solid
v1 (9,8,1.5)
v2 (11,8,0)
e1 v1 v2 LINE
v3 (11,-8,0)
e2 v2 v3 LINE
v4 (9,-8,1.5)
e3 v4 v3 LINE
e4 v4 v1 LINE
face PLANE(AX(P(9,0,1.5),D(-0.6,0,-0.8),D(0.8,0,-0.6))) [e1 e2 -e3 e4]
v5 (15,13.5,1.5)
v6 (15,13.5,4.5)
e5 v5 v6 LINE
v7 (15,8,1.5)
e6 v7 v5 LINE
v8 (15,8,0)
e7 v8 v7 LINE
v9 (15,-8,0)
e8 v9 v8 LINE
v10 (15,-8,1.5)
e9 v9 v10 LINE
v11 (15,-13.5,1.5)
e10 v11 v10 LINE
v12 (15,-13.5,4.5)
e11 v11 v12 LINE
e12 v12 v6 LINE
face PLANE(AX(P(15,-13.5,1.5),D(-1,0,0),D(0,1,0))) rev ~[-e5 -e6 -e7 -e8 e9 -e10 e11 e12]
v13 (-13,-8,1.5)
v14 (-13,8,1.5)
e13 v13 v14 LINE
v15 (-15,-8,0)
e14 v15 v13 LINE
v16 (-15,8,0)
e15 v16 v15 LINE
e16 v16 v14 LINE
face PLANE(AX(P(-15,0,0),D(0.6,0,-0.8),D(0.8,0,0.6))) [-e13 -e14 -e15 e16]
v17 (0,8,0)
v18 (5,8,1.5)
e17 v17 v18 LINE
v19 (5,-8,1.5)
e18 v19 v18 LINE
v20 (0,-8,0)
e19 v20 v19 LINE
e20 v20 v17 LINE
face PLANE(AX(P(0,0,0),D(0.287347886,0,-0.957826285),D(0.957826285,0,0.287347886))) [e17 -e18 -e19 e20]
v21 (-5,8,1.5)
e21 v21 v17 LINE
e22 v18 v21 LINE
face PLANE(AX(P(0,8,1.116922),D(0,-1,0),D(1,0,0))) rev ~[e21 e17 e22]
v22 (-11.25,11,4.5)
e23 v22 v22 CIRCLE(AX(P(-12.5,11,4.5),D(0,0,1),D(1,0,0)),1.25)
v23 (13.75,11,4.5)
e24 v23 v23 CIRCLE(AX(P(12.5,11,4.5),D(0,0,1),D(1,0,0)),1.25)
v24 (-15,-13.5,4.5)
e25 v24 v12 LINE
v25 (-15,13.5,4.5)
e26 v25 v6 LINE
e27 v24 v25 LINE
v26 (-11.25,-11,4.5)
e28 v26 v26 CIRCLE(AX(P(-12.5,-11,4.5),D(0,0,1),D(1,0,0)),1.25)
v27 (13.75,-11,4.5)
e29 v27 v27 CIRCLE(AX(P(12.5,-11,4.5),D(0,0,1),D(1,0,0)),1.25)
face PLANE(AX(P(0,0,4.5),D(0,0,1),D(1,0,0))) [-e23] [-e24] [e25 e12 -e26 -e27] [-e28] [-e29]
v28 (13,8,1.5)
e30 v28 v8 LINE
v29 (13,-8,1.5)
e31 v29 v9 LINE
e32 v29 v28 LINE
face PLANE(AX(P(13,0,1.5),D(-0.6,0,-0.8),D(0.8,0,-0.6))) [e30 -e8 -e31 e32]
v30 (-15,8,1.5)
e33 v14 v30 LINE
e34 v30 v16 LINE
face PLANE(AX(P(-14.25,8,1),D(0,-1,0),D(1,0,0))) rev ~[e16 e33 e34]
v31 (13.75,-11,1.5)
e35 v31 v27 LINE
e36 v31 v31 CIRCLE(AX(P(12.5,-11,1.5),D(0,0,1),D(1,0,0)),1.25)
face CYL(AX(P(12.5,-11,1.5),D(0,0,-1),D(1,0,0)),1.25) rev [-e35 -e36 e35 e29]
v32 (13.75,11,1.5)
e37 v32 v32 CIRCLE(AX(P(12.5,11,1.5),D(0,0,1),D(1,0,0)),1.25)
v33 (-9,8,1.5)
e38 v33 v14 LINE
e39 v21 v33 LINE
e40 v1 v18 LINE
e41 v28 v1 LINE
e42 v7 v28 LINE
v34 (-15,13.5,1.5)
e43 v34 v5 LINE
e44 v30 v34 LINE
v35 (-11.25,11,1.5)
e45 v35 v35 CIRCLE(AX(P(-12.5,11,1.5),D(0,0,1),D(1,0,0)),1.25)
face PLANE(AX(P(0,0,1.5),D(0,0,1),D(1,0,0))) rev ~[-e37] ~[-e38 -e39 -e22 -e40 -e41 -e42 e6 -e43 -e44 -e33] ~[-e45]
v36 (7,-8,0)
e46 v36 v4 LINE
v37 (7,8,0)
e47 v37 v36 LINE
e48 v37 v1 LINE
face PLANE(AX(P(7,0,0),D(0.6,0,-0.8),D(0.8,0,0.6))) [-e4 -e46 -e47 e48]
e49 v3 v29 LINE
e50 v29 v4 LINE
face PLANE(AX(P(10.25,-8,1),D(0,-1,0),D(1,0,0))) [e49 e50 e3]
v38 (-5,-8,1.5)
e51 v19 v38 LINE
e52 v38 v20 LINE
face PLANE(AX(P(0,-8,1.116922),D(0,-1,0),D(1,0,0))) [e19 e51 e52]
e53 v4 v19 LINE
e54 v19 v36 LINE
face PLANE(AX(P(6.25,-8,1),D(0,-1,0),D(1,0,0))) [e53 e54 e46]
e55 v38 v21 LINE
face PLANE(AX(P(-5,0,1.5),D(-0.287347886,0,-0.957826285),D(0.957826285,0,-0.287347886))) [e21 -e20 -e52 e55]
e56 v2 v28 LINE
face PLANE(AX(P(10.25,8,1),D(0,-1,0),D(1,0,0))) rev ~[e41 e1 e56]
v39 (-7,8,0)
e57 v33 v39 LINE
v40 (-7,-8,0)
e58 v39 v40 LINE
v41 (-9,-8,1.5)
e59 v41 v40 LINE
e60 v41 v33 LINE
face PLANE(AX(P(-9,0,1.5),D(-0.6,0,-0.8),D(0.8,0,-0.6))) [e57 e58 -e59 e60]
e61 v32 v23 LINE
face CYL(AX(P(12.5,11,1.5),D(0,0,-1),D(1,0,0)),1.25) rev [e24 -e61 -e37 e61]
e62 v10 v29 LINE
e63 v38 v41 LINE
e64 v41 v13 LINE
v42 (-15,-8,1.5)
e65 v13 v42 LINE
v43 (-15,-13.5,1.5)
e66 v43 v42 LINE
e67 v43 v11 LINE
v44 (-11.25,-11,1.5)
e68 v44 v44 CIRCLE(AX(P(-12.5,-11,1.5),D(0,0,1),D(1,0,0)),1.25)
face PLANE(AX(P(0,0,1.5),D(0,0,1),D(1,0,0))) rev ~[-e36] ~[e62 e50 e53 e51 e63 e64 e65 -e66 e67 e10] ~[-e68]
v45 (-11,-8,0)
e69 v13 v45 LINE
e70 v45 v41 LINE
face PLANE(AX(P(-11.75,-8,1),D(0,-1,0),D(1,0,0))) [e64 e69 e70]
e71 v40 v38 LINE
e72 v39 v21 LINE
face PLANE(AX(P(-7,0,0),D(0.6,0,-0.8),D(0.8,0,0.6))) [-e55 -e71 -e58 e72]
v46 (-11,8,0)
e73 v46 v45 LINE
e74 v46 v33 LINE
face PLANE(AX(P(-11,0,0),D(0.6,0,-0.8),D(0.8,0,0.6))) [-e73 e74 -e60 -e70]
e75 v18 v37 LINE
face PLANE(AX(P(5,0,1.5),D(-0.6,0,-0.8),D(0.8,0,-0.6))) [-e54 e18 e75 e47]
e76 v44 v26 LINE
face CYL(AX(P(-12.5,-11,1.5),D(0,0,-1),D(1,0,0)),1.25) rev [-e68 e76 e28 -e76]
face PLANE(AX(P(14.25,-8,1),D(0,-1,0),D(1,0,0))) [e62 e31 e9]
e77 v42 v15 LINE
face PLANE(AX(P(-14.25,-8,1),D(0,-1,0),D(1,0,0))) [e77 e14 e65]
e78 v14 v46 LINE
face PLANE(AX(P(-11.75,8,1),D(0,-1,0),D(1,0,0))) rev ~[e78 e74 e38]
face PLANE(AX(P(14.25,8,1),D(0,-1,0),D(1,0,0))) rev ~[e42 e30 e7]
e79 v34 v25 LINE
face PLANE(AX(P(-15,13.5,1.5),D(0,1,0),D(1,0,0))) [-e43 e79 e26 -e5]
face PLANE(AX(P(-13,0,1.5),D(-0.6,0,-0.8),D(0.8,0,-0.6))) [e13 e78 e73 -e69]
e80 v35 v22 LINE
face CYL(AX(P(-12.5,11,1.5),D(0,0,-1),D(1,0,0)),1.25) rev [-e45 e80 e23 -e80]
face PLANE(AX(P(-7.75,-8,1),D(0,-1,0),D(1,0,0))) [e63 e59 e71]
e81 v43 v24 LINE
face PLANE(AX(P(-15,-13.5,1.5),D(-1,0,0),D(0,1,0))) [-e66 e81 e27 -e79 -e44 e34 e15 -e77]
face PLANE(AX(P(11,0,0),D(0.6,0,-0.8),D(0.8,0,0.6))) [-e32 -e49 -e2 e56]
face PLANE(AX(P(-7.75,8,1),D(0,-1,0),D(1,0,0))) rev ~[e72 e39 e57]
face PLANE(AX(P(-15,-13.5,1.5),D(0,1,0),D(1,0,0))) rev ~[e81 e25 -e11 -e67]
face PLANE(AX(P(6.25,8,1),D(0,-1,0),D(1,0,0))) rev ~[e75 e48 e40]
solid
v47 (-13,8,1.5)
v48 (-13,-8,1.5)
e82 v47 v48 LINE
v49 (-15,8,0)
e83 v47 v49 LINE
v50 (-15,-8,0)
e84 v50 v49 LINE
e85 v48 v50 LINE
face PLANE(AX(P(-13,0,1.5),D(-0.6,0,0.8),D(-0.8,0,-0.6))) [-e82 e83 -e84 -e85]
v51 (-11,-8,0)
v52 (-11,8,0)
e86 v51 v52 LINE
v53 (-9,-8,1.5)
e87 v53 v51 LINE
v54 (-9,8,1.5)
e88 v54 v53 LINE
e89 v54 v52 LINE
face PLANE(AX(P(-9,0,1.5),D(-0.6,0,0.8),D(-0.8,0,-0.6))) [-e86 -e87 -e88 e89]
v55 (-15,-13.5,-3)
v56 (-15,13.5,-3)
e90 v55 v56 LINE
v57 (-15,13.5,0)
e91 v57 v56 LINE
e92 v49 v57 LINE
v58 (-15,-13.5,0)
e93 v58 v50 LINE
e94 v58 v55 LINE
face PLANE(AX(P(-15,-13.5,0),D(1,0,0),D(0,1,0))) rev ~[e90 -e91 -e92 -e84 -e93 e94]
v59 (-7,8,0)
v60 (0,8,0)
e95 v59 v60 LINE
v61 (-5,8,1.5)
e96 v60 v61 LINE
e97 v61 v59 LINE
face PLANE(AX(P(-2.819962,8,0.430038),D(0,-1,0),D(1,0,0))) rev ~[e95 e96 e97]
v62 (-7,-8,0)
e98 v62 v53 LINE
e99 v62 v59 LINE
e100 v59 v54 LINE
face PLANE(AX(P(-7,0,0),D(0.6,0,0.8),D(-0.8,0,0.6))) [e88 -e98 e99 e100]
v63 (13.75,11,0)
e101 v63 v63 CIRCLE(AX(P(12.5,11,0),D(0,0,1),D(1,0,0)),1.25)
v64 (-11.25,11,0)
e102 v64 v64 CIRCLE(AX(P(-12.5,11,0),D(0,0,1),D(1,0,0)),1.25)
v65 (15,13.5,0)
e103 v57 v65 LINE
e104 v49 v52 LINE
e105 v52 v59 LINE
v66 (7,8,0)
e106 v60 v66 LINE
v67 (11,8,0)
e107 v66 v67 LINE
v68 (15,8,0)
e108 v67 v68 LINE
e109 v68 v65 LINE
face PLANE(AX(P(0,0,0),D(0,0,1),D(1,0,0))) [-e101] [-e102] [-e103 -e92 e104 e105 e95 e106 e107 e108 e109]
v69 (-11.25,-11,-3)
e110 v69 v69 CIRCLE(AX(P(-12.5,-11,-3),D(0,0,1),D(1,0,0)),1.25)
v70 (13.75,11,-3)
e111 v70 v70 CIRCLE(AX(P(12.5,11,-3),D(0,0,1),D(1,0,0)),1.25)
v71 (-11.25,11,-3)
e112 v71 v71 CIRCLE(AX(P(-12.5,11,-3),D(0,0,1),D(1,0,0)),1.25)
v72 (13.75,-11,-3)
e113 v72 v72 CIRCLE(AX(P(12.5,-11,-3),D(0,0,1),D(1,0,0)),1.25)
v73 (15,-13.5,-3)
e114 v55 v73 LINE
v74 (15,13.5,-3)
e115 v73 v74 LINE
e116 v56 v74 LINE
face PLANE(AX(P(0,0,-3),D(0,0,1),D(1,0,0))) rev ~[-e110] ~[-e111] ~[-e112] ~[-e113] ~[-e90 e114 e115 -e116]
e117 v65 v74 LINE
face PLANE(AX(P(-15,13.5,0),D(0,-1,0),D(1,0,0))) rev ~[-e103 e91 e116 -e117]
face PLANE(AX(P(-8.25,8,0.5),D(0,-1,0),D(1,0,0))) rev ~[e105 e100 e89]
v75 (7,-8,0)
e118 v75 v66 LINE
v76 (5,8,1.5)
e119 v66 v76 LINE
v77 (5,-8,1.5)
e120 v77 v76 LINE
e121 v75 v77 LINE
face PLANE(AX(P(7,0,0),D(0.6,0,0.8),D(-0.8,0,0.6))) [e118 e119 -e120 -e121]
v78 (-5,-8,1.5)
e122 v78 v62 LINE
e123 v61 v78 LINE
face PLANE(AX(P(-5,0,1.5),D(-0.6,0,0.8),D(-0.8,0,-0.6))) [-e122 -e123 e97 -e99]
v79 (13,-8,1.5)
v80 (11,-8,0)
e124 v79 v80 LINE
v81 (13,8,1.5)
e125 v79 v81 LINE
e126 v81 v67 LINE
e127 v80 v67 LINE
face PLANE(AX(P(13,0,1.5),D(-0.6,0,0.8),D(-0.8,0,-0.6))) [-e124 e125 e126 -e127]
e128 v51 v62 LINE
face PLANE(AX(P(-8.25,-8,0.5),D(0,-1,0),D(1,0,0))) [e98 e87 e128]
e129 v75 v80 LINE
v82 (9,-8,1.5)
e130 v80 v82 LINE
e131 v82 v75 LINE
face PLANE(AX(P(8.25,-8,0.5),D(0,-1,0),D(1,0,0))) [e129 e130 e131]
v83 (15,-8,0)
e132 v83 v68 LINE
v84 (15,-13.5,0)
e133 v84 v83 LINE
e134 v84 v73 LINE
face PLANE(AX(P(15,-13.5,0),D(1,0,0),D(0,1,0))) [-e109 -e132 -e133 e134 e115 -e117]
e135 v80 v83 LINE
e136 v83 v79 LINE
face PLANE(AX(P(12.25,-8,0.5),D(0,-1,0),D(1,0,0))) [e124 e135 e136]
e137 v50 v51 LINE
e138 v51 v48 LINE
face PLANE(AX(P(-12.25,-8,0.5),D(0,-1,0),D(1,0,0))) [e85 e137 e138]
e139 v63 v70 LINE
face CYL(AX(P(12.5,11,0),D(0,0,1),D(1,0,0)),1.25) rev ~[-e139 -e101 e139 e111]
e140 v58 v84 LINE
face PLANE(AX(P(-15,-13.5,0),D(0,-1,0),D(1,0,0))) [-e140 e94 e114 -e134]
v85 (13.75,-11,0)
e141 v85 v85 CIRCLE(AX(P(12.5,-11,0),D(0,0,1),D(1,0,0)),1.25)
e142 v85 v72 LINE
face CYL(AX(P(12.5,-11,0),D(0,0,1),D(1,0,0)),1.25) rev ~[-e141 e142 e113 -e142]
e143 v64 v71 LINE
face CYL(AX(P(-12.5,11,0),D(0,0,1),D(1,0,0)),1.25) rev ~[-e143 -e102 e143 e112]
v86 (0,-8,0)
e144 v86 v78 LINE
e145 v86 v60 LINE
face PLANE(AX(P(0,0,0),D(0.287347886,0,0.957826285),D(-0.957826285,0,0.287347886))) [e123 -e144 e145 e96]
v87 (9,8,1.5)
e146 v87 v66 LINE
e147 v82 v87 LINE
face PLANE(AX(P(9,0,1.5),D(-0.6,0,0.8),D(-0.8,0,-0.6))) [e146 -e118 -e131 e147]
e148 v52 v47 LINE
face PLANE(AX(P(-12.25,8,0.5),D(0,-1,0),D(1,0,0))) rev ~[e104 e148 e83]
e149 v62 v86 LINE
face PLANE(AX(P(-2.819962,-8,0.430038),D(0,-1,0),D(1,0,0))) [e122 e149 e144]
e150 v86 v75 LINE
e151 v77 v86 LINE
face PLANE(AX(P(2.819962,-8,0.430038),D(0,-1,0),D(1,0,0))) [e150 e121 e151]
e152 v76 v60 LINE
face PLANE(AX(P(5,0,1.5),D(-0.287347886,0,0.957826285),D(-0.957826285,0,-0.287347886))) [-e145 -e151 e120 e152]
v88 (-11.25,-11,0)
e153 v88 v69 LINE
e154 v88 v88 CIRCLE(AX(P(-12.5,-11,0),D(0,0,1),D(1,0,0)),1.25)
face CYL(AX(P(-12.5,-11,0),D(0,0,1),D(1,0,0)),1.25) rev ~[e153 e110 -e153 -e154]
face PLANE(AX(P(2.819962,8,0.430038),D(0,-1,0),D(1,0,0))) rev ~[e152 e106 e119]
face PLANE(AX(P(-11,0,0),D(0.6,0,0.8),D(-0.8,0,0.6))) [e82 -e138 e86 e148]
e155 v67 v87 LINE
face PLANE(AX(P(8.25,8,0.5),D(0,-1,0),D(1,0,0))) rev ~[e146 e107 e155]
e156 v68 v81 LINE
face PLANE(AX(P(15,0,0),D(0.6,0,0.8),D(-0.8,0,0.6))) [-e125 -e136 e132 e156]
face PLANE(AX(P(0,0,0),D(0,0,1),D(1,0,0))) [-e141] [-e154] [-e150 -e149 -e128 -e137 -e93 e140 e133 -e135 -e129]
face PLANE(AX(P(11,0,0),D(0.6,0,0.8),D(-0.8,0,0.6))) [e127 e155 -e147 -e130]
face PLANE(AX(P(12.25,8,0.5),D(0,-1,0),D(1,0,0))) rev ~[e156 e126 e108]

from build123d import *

# Parameters (mm, degrees)
F2_DEPTH = 8
F0_W     = 30
F0_H     = 27
F0_R     = 1.25
F3_DEPTH = 3
F4_DEPTH = 8
F5_START = 1.5
F5_DEPTH = 3


with BuildPart() as f2:
    # F1 (on Front) → F2 (new body, symmetric)
    with BuildSketch(Plane.XZ):
        Polygon((-5, 1.5), (-5, 0), (0, 0), align=None)
        Polygon((-5, 1.5), (-7, 0), (-5, 0), align=None)
    extrude(amount=F2_DEPTH, both=True)



with BuildPart() as f2b:
    # F1 (on Front) → F2, piece 2 (new body, symmetric)
    with BuildSketch(Plane.XZ):
        Polygon((-9, 1.5), (-9, 0), (-7, 0), align=None)
        Polygon((-9, 1.5), (-11, 0), (-9, 0), align=None)
    extrude(amount=F2_DEPTH, both=True)


with BuildPart() as f2c:
    # F1 (on Front) → F2, piece 3 (new body, symmetric)
    with BuildSketch(Plane.XZ):
        Polygon((-13, 1.5), (-13, 0), (-11, 0), align=None)
        Polygon((-13, 1.5), (-15, 0), (-13, 0), align=None)
    extrude(amount=F2_DEPTH, both=True)


with BuildPart() as f2d:
    # F1 (on Front) → F2, piece 4 (new body, symmetric)
    with BuildSketch(Plane.XZ):
        Polygon((5, 1.5), (0, 0), (5, 0), align=None)
        Polygon((7, 0), (5, 1.5), (5, 0), align=None)
    extrude(amount=F2_DEPTH, both=True)


with BuildPart() as f2e:
    # F1 (on Front) → F2, piece 5 (new body, symmetric)
    with BuildSketch(Plane.XZ):
        Polygon((9, 1.5), (7, 0), (9, 0), align=None)
        Polygon((11, 0), (9, 1.5), (9, 0), align=None)
    extrude(amount=F2_DEPTH, both=True)


with BuildPart() as f2f:
    # F1 (on Front) → F2, piece 6 (new body, symmetric)
    with BuildSketch(Plane.XZ):
        Polygon((13, 1.5), (11, 0), (13, 0), align=None)
        Polygon((15, 0), (13, 1.5), (13, 0), align=None)
    extrude(amount=F2_DEPTH, both=True)


with BuildPart() as f2_1:
    add(f2.part)

    add(f2b.part)  # F3 merges F2b

    add(f2c.part)  # F3 merges F2c

    add(f2d.part)  # F3 merges F2d

    add(f2e.part)  # F3 merges F2e

    add(f2f.part)  # F3 merges F2f
    # F0 (on Top) → F3 (join)
    with BuildSketch(Plane.XY):
        Rectangle(F0_W, F0_H)
        with Locations((-12.5, -11)):
            Circle(F0_R, mode=Mode.SUBTRACT)
        with Locations((12.5, -11)):
            Circle(F0_R, mode=Mode.SUBTRACT)
        with Locations((-12.5, 11)):
            Circle(F0_R, mode=Mode.SUBTRACT)
        with Locations((12.5, 11)):
            Circle(F0_R, mode=Mode.SUBTRACT)
    extrude(amount=-F3_DEPTH)


with BuildPart() as f4:
    # F1 (on Front) → F4 (new body, symmetric)
    with BuildSketch(Plane.XZ):
        Polygon((-15, 1.5), (-15, 0), (-13, 1.5), align=None)
    extrude(amount=F4_DEPTH, both=True)

    # F1 (on Front) → F4, piece 2 (join, symmetric)
    with BuildSketch(Plane.XZ):
        Polygon((-11, 1.5), (-13, 1.5), (-11, 0), align=None)
        Polygon((-11, 1.5), (-11, 0), (-9, 1.5), align=None)
    extrude(amount=F4_DEPTH, both=True)

    # F1 (on Front) → F4, piece 3 (join, symmetric)
    with BuildSketch(Plane.XZ):
        Polygon((-7, 1.5), (-9, 1.5), (-7, 0), align=None)
        Polygon((-7, 1.5), (-7, 0), (-5, 1.5), align=None)
    extrude(amount=F4_DEPTH, both=True)

    # F1 (on Front) → F4, piece 4 (join, symmetric)
    with BuildSketch(Plane.XZ):
        Polygon((5, 1.5), (-5, 1.5), (0, 0), align=None)
    extrude(amount=F4_DEPTH, both=True)

    # F1 (on Front) → F4, piece 5 (join, symmetric)
    with BuildSketch(Plane.XZ):
        Polygon((7, 1.5), (5, 1.5), (7, 0), align=None)
        Polygon((9, 1.5), (7, 1.5), (7, 0), align=None)
    extrude(amount=F4_DEPTH, both=True)

    # F1 (on Front) → F4, piece 6 (join, symmetric)
    with BuildSketch(Plane.XZ):
        Polygon((11, 1.5), (9, 1.5), (11, 0), align=None)
        Polygon((13, 1.5), (11, 1.5), (11, 0), align=None)
    extrude(amount=F4_DEPTH, both=True)

    # F1 (on Front) → F4, piece 7 (join, symmetric)
    with BuildSketch(Plane.XZ):
        Polygon((15, 1.5), (13, 1.5), (15, 0), align=None)
    extrude(amount=F4_DEPTH, both=True)

    # F0 (on Top) → F5 (join)
    with BuildSketch(Plane.XY.offset(F5_START)):
        Rectangle(F0_W, F0_H)
        with Locations((-12.5, -11)):
            Circle(F0_R, mode=Mode.SUBTRACT)
        with Locations((12.5, -11)):
            Circle(F0_R, mode=Mode.SUBTRACT)
        with Locations((-12.5, 11)):
            Circle(F0_R, mode=Mode.SUBTRACT)
        with Locations((12.5, 11)):
            Circle(F0_R, mode=Mode.SUBTRACT)
    extrude(amount=F5_DEPTH)


solid = Compound([f2_1.part, f4.part])
